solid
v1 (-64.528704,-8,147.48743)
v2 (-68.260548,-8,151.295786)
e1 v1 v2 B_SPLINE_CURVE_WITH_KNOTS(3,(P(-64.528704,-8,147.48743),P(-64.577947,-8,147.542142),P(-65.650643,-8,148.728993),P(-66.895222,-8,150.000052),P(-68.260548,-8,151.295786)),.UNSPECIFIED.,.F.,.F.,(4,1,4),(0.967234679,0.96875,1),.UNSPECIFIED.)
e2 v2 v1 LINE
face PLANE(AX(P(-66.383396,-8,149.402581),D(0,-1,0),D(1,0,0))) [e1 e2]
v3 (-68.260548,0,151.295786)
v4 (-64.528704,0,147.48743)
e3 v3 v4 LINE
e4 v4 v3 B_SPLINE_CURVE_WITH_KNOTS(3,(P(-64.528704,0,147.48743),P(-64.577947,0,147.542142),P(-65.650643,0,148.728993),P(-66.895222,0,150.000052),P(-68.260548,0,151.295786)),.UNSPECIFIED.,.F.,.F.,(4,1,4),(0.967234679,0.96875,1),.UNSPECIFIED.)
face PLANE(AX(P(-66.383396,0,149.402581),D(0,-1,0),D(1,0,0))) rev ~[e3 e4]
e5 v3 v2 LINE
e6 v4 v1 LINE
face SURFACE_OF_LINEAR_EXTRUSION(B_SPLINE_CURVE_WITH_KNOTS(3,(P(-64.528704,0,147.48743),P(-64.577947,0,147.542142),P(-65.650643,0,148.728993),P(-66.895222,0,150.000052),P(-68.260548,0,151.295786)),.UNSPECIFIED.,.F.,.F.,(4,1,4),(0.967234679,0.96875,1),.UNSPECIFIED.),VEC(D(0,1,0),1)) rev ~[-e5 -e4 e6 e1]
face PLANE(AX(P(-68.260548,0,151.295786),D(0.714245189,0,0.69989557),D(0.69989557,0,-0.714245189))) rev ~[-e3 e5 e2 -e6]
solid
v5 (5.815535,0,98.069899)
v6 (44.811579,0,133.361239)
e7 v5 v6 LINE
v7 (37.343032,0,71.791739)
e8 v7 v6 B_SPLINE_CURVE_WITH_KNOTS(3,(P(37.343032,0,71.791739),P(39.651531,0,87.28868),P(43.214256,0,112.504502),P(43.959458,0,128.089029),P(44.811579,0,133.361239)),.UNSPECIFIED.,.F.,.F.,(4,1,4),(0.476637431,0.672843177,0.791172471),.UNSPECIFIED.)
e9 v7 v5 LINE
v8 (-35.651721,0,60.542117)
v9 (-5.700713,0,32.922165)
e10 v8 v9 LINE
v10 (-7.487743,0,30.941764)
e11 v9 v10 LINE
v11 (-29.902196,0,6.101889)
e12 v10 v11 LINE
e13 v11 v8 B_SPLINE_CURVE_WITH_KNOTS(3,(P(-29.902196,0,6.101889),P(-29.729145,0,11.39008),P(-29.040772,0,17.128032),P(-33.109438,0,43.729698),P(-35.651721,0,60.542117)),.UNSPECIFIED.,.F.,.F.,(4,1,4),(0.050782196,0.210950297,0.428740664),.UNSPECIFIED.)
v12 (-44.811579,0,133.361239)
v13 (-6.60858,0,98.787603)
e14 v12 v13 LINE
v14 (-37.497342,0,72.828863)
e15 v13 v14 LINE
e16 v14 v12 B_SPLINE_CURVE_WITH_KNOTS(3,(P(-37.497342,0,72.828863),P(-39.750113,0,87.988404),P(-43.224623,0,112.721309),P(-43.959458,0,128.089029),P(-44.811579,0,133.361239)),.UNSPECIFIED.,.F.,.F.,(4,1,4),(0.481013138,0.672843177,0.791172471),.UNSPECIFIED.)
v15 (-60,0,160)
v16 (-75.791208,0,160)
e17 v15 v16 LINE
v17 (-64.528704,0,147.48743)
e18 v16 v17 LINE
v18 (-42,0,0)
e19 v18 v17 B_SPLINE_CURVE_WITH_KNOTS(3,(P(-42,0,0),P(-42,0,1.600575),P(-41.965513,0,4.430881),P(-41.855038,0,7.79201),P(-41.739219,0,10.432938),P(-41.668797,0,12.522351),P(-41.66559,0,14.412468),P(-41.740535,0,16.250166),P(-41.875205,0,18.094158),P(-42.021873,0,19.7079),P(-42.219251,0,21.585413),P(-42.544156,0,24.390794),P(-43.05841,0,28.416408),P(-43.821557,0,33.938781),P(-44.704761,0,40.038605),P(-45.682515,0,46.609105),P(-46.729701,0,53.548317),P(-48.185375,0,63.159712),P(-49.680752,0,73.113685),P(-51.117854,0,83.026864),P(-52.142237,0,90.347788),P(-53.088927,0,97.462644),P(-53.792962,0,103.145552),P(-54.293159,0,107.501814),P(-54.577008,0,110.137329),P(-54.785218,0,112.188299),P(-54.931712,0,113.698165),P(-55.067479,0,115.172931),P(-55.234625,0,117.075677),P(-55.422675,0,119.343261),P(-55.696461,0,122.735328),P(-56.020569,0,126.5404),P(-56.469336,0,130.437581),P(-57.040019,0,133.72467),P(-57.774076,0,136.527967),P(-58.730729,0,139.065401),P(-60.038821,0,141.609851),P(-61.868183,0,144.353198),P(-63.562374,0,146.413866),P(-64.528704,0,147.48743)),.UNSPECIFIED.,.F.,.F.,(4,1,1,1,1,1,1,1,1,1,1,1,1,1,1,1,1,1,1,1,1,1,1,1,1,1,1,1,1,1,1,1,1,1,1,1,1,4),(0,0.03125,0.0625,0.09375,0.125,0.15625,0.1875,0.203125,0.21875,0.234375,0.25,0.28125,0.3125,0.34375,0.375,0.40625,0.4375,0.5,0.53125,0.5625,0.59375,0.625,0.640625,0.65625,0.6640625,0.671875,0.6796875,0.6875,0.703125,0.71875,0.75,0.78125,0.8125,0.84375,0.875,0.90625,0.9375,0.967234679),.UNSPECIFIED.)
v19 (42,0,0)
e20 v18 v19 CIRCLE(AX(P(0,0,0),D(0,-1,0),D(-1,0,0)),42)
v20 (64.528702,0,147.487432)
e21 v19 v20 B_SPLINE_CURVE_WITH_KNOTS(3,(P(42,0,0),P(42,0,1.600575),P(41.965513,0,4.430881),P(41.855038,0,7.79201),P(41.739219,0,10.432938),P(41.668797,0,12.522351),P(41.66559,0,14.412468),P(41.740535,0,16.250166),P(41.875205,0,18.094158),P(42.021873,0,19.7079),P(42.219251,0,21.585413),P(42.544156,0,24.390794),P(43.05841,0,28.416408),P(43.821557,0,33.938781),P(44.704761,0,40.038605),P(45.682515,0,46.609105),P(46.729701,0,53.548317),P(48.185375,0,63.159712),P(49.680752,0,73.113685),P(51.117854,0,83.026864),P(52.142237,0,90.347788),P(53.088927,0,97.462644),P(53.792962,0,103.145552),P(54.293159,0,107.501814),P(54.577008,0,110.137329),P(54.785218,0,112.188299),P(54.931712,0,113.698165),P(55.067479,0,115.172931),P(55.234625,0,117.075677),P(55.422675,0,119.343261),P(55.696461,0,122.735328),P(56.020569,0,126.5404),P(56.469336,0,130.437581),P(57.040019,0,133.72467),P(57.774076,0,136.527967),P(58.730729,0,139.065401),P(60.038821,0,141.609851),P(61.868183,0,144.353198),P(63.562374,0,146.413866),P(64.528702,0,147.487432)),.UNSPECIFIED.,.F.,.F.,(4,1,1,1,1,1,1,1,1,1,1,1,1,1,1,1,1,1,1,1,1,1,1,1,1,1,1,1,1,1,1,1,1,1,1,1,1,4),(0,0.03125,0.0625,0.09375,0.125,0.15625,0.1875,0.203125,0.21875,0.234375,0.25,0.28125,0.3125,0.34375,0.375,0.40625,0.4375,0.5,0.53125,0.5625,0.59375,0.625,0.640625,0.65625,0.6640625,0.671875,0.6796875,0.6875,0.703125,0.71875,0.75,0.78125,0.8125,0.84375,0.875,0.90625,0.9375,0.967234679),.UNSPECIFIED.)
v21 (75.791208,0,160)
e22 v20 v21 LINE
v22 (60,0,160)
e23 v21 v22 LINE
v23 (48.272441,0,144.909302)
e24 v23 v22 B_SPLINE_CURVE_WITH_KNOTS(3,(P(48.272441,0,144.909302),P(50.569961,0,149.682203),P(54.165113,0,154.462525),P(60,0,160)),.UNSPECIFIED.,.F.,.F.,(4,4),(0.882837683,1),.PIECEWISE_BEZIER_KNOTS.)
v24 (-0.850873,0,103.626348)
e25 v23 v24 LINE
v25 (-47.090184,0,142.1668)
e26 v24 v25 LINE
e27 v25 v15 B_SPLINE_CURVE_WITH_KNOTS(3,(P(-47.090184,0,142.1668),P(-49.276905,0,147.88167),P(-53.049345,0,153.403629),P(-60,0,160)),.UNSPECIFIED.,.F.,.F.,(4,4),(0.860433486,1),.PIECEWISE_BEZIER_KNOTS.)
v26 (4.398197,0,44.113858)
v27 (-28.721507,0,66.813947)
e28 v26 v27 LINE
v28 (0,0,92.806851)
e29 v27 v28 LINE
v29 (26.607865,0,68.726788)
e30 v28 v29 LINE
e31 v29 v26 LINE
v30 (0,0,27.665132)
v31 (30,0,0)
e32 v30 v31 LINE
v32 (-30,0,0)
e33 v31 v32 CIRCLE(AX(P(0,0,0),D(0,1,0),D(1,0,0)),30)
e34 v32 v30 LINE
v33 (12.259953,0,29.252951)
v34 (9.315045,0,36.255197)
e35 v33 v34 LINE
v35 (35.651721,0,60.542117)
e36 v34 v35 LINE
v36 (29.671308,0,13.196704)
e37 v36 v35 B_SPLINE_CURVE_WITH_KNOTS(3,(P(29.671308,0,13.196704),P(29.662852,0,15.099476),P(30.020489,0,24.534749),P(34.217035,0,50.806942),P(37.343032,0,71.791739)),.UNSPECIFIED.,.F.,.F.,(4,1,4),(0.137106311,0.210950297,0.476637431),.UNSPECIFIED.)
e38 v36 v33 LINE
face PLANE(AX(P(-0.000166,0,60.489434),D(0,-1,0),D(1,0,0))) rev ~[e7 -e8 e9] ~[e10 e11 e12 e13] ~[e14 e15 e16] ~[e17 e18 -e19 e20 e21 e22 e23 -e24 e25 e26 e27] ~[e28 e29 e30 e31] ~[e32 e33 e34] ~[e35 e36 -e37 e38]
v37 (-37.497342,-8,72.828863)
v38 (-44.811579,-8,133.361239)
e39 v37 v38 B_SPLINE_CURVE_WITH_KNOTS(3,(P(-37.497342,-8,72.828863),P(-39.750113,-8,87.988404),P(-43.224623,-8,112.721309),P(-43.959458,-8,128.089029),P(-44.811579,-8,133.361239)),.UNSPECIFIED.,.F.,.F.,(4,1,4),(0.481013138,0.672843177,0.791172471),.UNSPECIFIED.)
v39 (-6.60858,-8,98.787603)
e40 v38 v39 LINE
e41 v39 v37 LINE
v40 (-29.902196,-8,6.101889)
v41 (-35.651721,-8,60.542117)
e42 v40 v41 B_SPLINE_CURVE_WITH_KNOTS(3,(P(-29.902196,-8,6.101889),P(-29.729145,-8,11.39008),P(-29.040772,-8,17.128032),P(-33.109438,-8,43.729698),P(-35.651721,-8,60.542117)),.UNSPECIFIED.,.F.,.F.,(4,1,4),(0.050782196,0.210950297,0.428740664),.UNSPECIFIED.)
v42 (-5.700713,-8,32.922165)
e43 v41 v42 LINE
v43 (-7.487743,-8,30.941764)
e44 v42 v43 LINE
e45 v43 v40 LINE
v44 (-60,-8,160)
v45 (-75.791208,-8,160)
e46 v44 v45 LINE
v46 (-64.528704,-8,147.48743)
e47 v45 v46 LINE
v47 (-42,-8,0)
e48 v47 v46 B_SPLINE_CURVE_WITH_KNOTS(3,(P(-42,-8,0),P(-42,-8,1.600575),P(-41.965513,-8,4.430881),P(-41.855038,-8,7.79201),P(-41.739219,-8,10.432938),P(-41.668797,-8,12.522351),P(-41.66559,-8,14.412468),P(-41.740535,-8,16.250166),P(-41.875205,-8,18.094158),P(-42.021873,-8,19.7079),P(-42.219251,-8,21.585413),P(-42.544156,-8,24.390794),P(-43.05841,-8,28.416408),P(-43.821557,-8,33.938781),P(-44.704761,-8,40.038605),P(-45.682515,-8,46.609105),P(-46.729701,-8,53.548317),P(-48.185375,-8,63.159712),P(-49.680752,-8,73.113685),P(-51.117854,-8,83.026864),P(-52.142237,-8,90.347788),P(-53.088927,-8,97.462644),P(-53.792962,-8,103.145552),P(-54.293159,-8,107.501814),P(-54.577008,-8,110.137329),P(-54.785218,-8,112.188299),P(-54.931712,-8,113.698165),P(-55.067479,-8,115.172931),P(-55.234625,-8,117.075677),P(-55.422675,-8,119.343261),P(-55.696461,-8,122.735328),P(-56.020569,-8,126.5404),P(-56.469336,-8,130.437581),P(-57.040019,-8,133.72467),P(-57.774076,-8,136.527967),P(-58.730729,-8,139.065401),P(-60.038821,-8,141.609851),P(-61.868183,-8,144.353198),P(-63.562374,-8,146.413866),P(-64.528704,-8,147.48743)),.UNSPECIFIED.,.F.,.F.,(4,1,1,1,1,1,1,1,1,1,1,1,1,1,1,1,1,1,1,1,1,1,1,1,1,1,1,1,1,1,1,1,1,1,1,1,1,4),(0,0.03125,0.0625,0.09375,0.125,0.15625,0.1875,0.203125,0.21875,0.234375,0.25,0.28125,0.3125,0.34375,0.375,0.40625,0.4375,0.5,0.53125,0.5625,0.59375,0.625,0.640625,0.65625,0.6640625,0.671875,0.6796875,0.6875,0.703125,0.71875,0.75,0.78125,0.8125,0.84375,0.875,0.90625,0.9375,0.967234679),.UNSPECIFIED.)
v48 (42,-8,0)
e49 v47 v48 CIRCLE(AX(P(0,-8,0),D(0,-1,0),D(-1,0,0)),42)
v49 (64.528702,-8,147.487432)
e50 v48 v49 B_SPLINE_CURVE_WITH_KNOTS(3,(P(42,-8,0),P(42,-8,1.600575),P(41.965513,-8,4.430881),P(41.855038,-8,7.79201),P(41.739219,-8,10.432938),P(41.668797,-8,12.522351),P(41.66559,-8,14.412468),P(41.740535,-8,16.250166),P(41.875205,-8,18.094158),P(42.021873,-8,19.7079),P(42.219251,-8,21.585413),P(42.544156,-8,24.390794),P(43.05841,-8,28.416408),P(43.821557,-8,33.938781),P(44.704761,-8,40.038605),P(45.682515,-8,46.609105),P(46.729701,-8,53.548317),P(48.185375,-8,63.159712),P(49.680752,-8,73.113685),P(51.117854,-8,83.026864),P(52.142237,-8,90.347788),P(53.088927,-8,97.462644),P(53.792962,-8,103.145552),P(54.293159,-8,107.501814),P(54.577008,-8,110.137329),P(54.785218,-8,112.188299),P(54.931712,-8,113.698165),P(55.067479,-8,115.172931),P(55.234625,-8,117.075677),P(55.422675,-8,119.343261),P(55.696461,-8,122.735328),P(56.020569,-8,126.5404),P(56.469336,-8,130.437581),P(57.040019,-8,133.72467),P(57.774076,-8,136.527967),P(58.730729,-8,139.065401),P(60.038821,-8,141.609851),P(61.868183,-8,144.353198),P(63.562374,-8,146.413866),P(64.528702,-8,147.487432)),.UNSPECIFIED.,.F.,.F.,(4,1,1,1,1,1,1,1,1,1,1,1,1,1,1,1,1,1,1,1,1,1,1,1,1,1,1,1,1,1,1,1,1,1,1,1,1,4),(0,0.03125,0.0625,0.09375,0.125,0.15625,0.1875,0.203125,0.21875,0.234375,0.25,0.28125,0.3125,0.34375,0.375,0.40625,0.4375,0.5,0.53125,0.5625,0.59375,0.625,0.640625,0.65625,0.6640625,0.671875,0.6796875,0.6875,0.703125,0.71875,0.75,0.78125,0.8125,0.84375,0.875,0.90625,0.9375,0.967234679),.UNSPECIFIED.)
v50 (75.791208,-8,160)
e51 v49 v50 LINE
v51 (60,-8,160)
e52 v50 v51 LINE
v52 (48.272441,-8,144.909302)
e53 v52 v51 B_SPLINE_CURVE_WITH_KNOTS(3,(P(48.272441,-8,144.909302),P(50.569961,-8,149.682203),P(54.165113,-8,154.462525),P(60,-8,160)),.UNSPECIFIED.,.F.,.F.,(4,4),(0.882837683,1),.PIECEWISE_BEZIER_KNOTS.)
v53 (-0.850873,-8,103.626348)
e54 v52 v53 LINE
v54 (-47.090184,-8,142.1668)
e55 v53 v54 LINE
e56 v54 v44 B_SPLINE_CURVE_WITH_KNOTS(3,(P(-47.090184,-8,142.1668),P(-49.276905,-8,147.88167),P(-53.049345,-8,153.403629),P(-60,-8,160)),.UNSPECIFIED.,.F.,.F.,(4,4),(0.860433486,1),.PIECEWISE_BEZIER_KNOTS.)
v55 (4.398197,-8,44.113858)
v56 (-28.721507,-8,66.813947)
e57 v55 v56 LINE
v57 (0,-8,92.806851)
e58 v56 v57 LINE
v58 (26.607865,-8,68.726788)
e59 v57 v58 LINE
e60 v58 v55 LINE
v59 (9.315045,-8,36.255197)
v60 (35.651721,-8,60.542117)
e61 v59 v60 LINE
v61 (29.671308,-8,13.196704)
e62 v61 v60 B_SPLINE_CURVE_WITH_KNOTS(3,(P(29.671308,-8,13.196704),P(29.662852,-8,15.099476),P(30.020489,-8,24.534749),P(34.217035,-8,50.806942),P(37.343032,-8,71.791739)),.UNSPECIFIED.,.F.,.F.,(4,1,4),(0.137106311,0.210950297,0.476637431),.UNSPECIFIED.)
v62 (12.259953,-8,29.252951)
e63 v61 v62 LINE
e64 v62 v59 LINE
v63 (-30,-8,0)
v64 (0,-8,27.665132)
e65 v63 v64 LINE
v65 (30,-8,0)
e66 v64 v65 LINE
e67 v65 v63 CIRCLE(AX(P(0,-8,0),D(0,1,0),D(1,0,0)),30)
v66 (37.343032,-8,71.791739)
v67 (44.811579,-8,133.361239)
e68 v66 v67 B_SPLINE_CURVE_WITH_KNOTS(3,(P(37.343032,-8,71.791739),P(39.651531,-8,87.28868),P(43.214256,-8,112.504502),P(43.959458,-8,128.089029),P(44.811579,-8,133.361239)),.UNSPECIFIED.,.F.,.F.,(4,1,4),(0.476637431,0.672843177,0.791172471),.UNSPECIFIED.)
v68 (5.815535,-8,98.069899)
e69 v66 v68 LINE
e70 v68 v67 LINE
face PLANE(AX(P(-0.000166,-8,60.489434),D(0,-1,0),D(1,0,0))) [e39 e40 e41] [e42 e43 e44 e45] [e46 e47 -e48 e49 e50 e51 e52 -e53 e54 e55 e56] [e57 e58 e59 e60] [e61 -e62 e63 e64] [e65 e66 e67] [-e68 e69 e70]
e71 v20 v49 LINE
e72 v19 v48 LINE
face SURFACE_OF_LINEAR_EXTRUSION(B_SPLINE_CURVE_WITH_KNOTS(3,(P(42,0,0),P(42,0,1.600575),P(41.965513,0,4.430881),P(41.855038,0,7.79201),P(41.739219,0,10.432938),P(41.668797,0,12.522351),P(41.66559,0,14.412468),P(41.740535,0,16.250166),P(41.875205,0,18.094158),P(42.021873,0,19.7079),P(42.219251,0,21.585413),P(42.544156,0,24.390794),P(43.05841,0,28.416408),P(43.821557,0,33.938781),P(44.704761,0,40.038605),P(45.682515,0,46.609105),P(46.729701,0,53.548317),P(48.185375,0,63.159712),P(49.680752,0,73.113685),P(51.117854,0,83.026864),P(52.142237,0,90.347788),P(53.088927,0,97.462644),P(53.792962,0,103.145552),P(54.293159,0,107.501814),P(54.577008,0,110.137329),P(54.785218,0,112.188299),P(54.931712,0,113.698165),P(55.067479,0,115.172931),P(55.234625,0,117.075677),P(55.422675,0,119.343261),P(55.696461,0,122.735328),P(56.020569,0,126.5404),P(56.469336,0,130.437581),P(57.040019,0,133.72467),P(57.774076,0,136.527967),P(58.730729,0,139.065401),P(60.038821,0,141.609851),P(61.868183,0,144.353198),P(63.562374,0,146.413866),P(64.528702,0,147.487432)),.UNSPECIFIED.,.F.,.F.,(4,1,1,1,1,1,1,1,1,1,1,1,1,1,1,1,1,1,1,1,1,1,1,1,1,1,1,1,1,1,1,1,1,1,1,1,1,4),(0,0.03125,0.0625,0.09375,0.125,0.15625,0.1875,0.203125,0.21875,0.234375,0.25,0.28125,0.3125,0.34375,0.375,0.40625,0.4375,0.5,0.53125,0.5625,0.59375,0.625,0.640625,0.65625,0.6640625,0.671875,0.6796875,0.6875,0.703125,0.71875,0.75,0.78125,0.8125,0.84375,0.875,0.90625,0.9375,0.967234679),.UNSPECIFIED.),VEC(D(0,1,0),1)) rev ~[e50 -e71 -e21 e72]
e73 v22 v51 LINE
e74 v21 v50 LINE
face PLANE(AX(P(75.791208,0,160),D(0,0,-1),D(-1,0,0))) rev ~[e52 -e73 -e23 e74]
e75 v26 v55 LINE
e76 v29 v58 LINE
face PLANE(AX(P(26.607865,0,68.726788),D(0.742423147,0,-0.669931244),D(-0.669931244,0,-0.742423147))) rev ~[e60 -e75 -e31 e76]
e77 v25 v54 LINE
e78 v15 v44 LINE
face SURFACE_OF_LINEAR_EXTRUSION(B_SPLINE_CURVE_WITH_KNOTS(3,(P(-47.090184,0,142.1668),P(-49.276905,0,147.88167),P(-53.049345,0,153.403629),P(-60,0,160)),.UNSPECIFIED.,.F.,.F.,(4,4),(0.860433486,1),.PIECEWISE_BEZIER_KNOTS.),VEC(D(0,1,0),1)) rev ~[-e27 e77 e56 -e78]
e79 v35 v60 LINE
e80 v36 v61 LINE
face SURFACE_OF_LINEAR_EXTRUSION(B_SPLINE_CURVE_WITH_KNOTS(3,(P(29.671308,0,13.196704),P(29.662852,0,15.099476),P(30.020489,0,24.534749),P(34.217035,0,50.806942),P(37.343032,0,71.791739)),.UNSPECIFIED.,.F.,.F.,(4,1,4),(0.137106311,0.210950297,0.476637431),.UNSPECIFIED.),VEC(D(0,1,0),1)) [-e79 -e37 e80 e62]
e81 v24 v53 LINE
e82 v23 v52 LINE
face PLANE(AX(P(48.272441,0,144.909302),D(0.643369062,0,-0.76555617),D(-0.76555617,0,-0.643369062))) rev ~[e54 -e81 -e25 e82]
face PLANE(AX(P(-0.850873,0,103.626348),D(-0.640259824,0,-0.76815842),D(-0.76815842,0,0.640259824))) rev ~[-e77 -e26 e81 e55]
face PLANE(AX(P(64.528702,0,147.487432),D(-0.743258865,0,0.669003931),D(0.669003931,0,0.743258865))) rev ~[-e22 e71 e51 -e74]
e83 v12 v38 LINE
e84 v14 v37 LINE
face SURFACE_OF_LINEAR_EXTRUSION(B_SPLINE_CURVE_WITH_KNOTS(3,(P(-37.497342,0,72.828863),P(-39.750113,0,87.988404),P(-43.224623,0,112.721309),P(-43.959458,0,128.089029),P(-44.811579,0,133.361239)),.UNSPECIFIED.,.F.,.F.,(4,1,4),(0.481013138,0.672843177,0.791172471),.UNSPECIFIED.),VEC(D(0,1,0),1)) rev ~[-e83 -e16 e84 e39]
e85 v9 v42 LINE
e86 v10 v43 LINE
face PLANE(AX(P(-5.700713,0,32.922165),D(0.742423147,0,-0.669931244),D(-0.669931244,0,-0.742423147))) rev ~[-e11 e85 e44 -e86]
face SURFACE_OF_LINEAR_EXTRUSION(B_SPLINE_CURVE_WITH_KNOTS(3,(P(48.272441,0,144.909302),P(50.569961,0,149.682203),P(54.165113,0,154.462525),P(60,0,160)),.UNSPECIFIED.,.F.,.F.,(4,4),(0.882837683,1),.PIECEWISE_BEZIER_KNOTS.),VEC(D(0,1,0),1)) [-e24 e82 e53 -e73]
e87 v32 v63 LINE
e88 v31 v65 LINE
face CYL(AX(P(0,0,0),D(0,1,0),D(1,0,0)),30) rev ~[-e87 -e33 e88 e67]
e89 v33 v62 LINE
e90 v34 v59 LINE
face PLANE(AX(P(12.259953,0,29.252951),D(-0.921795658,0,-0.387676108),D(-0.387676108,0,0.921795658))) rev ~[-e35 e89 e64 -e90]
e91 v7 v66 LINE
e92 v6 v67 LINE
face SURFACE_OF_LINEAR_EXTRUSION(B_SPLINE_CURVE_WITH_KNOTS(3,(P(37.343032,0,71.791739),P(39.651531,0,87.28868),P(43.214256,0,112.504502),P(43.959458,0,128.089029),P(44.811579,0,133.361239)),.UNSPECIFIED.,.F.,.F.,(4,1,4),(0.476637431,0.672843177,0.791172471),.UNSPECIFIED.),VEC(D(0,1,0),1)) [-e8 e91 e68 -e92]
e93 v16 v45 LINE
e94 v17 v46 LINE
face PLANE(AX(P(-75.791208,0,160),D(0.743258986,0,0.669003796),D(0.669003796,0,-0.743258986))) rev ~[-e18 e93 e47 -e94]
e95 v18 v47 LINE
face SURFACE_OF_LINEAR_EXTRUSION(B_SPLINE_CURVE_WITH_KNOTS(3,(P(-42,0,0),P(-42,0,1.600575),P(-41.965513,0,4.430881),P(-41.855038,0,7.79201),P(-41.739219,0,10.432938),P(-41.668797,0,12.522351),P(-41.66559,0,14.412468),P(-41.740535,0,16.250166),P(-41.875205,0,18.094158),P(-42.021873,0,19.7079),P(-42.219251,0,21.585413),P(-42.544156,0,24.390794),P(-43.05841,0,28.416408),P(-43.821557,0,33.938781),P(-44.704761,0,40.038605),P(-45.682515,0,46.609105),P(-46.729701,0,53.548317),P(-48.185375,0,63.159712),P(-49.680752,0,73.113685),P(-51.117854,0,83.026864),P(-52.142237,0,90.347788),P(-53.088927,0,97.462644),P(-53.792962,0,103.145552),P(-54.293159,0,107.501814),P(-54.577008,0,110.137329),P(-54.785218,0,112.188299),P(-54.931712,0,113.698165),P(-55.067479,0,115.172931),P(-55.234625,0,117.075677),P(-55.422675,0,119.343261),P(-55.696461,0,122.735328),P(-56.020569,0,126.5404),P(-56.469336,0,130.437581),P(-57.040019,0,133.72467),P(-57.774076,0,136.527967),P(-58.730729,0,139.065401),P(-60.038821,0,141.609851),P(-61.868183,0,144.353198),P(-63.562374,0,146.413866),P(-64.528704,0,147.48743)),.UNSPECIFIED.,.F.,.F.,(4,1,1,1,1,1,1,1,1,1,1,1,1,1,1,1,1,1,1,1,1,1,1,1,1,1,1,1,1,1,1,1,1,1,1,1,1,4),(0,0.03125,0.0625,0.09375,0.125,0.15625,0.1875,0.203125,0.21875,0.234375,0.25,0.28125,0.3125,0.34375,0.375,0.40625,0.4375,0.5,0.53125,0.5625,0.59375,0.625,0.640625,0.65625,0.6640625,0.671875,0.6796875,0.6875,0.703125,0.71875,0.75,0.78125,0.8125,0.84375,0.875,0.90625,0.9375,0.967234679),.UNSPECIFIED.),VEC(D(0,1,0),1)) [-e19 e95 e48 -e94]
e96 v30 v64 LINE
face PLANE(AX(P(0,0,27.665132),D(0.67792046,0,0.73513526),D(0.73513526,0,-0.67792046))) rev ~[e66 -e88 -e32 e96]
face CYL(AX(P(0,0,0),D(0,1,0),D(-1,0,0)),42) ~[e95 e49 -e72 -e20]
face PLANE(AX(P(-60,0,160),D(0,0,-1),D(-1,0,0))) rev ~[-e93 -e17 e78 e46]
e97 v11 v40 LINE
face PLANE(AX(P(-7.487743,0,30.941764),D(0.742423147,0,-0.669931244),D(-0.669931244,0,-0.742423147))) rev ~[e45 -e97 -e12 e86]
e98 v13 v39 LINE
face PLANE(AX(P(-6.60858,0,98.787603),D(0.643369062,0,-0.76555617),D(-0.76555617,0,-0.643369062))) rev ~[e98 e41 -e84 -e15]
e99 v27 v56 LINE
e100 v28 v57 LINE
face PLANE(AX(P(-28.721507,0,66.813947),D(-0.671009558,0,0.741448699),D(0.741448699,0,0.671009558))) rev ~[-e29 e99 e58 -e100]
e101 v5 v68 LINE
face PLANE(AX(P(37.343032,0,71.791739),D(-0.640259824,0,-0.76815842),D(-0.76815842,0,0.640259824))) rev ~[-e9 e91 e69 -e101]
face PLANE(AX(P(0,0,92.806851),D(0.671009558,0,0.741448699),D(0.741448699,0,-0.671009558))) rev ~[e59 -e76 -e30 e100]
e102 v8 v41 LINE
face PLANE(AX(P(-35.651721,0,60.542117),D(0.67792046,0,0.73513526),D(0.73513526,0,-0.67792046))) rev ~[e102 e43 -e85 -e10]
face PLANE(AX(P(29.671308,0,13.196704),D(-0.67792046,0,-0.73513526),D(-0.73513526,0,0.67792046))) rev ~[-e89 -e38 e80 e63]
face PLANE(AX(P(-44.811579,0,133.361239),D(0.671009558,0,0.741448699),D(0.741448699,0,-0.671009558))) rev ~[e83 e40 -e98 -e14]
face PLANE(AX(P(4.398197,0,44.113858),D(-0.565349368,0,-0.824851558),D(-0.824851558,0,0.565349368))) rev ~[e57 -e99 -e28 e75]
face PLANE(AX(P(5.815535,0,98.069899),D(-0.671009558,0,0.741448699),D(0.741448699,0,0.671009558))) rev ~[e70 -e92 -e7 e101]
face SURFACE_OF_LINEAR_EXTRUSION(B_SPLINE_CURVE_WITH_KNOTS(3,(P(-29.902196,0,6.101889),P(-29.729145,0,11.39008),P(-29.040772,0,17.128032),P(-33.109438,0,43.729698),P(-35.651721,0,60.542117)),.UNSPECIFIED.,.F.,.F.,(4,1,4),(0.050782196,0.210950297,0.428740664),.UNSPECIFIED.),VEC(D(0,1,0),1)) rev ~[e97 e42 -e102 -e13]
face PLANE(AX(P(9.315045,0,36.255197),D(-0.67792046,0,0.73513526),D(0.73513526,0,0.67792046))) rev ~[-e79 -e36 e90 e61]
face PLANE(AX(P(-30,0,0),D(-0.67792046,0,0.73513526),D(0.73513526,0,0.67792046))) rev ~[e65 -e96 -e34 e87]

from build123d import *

# Parameters (mm, degrees)
F1_DEPTH = 8


# Not quite as in the source:
# - ends of sketch curves that miss each other by under 0.0002 mm in the source are joined
# - the dataset's text gives a spline's control points without its knots; the knots are read off the source's solid


with BuildPart() as f1:
    # F0 (on Front) → F1 (new body)
    with BuildSketch(Plane.XZ):
        with BuildLine():
            ThreePointArc((30, 0), (0, -30), (-30, 0))
            add(Edge.make_bspline(
                [(-30, 0), (-30, 2.4614289794), (-29.9570620291, 4.425238293), (-29.9021955407, 6.1018890111)],
                knots=[0, 0, 0, 0, 0.0507821961, 0.0507821961, 0.0507821961, 0.0507821961], degree=3))
            add(Edge.make_bspline(
                [(-29.9021955407, 6.1018890111), (-29.729145497, 11.3900801856), (-29.0407722192, 17.1280316278), (-33.1094379747, 43.7296976474), (-35.6517208897, 60.5421168552)],
                knots=[0.0507821961, 0.0507821961, 0.0507821961, 0.0507821961, 0.2109502969, 0.4287406637, 0.4287406637, 0.4287406637, 0.4287406637], degree=3))
            add(Edge.make_bspline(
                [(-35.6517208897, 60.5421168552), (-36.2619013169, 64.5773125741), (-36.8834763856, 68.6979834975), (-37.4973421406, 72.8288627488)],
                knots=[0.4287406637, 0.4287406637, 0.4287406637, 0.4287406637, 0.4810131383, 0.4810131383, 0.4810131383, 0.4810131383], degree=3))
            add(Edge.make_bspline(
                [(-37.4973421406, 72.8288627488), (-39.7501126984, 87.9884038692), (-43.2246230426, 112.7213086259), (-43.9594576429, 128.0890294092), (-44.8115788997, 133.3612387466)],
                knots=[0.4810131383, 0.4810131383, 0.4810131383, 0.4810131383, 0.6728431772, 0.7911724712, 0.7911724712, 0.7911724712, 0.7911724712], degree=3))
            add(Edge.make_bspline(
                [(-44.8115788997, 133.3612387466), (-45.3103462028, 136.447191141), (-46.0050057355, 139.330749893), (-47.0901836836, 142.1668002137)],
                knots=[0.7911724712, 0.7911724712, 0.7911724712, 0.7911724712, 0.8604334859, 0.8604334859, 0.8604334859, 0.8604334859], degree=3))
            add(Edge.make_bspline(
                [(-47.0901836836, 142.1668002137), (-49.276904514, 147.8816696714), (-53.0493445367, 153.4036288123), (-60, 160)],
                knots=[0.8604334859, 0.8604334859, 0.8604334859, 0.8604334859, 1, 1, 1, 1], degree=3))
            Line((-60, 160), (-75.7912078503, 160))
            Line((-75.7912078503, 160), (-64.5287041289, 147.4874296074))
            add(Edge.make_bspline(
                [(-42, 0), (-42, 1.6005754669), (-41.9655130874, 4.4308812587), (-41.855037906, 7.7920099217), (-41.7392191804, 10.4329382139), (-41.6687973515, 12.5223510859), (-41.6655902329, 14.4124679691), (-41.7405354814, 16.2501659159), (-41.8752052785, 18.0941584324), (-42.0218726875, 19.7078997416), (-42.2192508321, 21.5854126614), (-42.5441555785, 24.3907941472), (-43.0584097586, 28.4164081533), (-43.8215565262, 33.9387807166), (-44.704760888, 40.0386050466), (-45.6825150065, 46.6091045203), (-46.729700777, 53.5483169764), (-48.1853745042, 63.1597115369), (-49.6807523059, 73.1136847555), (-51.1178539545, 83.0268637762), (-52.1422369475, 90.3477881632), (-53.0889269797, 97.46264393), (-53.7929616933, 103.1455520068), (-54.2931590626, 107.5018139684), (-54.5770081877, 110.1373290926), (-54.785218118, 112.1882992533), (-54.9317117815, 113.6981648795), (-55.0674795, 115.1729311359), (-55.2346249069, 117.0756772852), (-55.4226748319, 119.3432613555), (-55.6964606027, 122.7353278016), (-56.0205686836, 126.5404004884), (-56.4693363175, 130.4375806245), (-57.0400191966, 133.724670433), (-57.7740762341, 136.5279673443), (-58.7307292964, 139.0654005001), (-60.038821229, 141.6098513339), (-61.868182594, 144.3531979669), (-63.5623744944, 146.4138663543), (-64.5287041289, 147.4874296074)],
                knots=[0, 0, 0, 0, 0.03125, 0.0625, 0.09375, 0.125, 0.15625, 0.1875, 0.203125, 0.21875, 0.234375, 0.25, 0.28125, 0.3125, 0.34375, 0.375, 0.40625, 0.4375, 0.5, 0.53125, 0.5625, 0.59375, 0.625, 0.640625, 0.65625, 0.6640625, 0.671875, 0.6796875, 0.6875, 0.703125, 0.71875, 0.75, 0.78125, 0.8125, 0.84375, 0.875, 0.90625, 0.9375, 0.9672346787, 0.9672346787, 0.9672346787, 0.9672346787], degree=3))
            ThreePointArc((-42, 0), (0, -42), (42, 0))
            add(Edge.make_bspline(
                [(42, 0), (42, 1.6005754669), (41.9655130874, 4.4308812587), (41.855037906, 7.7920099217), (41.7392191804, 10.4329382139), (41.6687973515, 12.5223510859), (41.6655902329, 14.4124679691), (41.7405354814, 16.2501659159), (41.8752052785, 18.0941584324), (42.0218726875, 19.7078997416), (42.2192508321, 21.5854126614), (42.5441555785, 24.3907941472), (43.0584097586, 28.4164081533), (43.8215565262, 33.9387807166), (44.704760888, 40.0386050466), (45.6825150065, 46.6091045203), (46.729700777, 53.5483169764), (48.1853745042, 63.1597115369), (49.6807523059, 73.1136847555), (51.1178539545, 83.0268637762), (52.1422369475, 90.3477881632), (53.0889269797, 97.46264393), (53.7929616933, 103.1455520068), (54.2931590626, 107.5018139684), (54.5770081877, 110.1373290926), (54.785218118, 112.1882992533), (54.9317117815, 113.6981648795), (55.0674795, 115.1729311359), (55.2346249069, 117.0756772852), (55.4226748319, 119.3432613555), (55.6964606027, 122.7353278016), (56.0205686836, 126.5404004884), (56.4693363175, 130.4375806245), (57.0400191966, 133.724670433), (57.7740762341, 136.5279673443), (58.7307292964, 139.0654005001), (60.038821229, 141.6098513339), (61.8681825939, 144.3531979667), (63.5623744942, 146.413866354), (64.5287018696, 147.4874316403)],
                knots=[0, 0, 0, 0, 0.03125, 0.0625, 0.09375, 0.125, 0.15625, 0.1875, 0.203125, 0.21875, 0.234375, 0.25, 0.28125, 0.3125, 0.34375, 0.375, 0.40625, 0.4375, 0.5, 0.53125, 0.5625, 0.59375, 0.625, 0.640625, 0.65625, 0.6640625, 0.671875, 0.6796875, 0.6875, 0.703125, 0.71875, 0.75, 0.78125, 0.8125, 0.84375, 0.875, 0.90625, 0.9375, 0.9672346787, 0.9672346787, 0.9672346787, 0.9672346787], degree=3))
            Line((64.5287018696, 147.4874316403), (75.7912078503, 160))
            Line((75.7912078503, 160), (60, 160))
            add(Edge.make_bspline(
                [(48.2724414023, 144.9093022824), (50.569960834, 149.6822034282), (54.1651125594, 154.4625246354), (60, 160)],
                knots=[0.8828376828, 0.8828376828, 0.8828376828, 0.8828376828, 1, 1, 1, 1], degree=3))
            add(Edge.make_bspline(
                [(44.8115788997, 133.3612387466), (45.4716848854, 137.4454191543), (46.4749128994, 141.175089752), (48.2724414023, 144.9093022824)],
                knots=[0.7911724712, 0.7911724712, 0.7911724712, 0.7911724712, 0.8828376828, 0.8828376828, 0.8828376828, 0.8828376828], degree=3))
            add(Edge.make_bspline(
                [(37.3430319519, 71.791739017), (39.6515310986, 87.288679601), (43.214256046, 112.504501865), (43.9594576429, 128.0890294092), (44.8115788997, 133.3612387466)],
                knots=[0.4766374315, 0.4766374315, 0.4766374315, 0.4766374315, 0.6728431772, 0.7911724712, 0.7911724712, 0.7911724712, 0.7911724712], degree=3))
            add(Edge.make_bspline(
                [(35.6517208897, 60.5421168552), (36.2108233707, 64.2395280423), (36.7794926575, 68.008703197), (37.3430319519, 71.791739017)],
                knots=[0.4287406637, 0.4287406637, 0.4287406637, 0.4287406637, 0.4766374315, 0.4766374315, 0.4766374315, 0.4766374315], degree=3))
            add(Edge.make_bspline(
                [(29.6713075743, 13.1967035579), (29.6628515767, 15.0994757405), (29.9700382624, 23.2037395896), (33.1094379747, 43.7296976474), (35.6517208897, 60.5421168552)],
                knots=[0.1371063109, 0.1371063109, 0.1371063109, 0.1371063109, 0.2109502969, 0.4287406637, 0.4287406637, 0.4287406637, 0.4287406637], degree=3))
            add(Edge.make_bspline(
                [(30, 0), (30, 6.6455859091), (29.6870078458, 9.6638217567), (29.6713075743, 13.1967035579)],
                knots=[0, 0, 0, 0, 0.1371063109, 0.1371063109, 0.1371063109, 0.1371063109], degree=3))
        make_face()
        with BuildLine():
            add(Edge.make_bspline(
                [(-30, 0), (-30, 2.4614289794), (-29.9570620291, 4.425238293), (-29.9021955407, 6.1018890111)],
                knots=[0, 0, 0, 0, 0.0507821961, 0.0507821961, 0.0507821961, 0.0507821961], degree=3))
            Line((-30, 0), (0, 27.6651317139))
            Line((0, 27.6651317139), (30, 0))
            add(Edge.make_bspline(
                [(30, 0), (30, 6.6455859091), (29.6870078458, 9.6638217567), (29.6713075743, 13.1967035579)],
                knots=[0, 0, 0, 0, 0.1371063109, 0.1371063109, 0.1371063109, 0.1371063109], degree=3))
            Line((29.6713075743, 13.1967035579), (12.2599532494, 29.2529505818))
            Line((12.2599532494, 29.2529505818), (9.3150451178, 36.2551967174))
            Line((9.3150451178, 36.2551967174), (35.6517208897, 60.5421168552))
            add(Edge.make_bspline(
                [(35.6517208897, 60.5421168552), (36.2108233707, 64.2395280423), (36.7794926575, 68.008703197), (37.3430319519, 71.791739017)],
                knots=[0.4287406637, 0.4287406637, 0.4287406637, 0.4287406637, 0.4766374315, 0.4766374315, 0.4766374315, 0.4766374315], degree=3))
            Line((37.3430319519, 71.791739017), (5.8155350287, 98.0698987276))
            Line((5.8155350287, 98.0698987276), (44.8115788997, 133.3612387466))
            add(Edge.make_bspline(
                [(44.8115788997, 133.3612387466), (45.4716848854, 137.4454191543), (46.4749128994, 141.175089752), (48.2724414023, 144.9093022824)],
                knots=[0.7911724712, 0.7911724712, 0.7911724712, 0.7911724712, 0.8828376828, 0.8828376828, 0.8828376828, 0.8828376828], degree=3))
            Line((48.2724414023, 144.9093022824), (-0.8508727636, 103.6263477247))
            Line((-0.8508727636, 103.6263477247), (-47.0901836836, 142.1668002137))
            add(Edge.make_bspline(
                [(-44.8115788997, 133.3612387466), (-45.3103462028, 136.447191141), (-46.0050057355, 139.330749893), (-47.0901836836, 142.1668002137)],
                knots=[0.7911724712, 0.7911724712, 0.7911724712, 0.7911724712, 0.8604334859, 0.8604334859, 0.8604334859, 0.8604334859], degree=3))
            Line((-44.8115788997, 133.3612387466), (-6.6085802404, 98.7876030236))
            Line((-6.6085802404, 98.7876030236), (-37.4973421406, 72.8288627488))
            add(Edge.make_bspline(
                [(-35.6517208897, 60.5421168552), (-36.2619013169, 64.5773125741), (-36.8834763856, 68.6979834975), (-37.4973421406, 72.8288627488)],
                knots=[0.4287406637, 0.4287406637, 0.4287406637, 0.4287406637, 0.4810131383, 0.4810131383, 0.4810131383, 0.4810131383], degree=3))
            Line((-35.6517208897, 60.5421168552), (-5.7007133502, 32.9221645704))
            Line((-5.7007133502, 32.9221645704), (-7.4877431959, 30.9417638447))
            Line((-7.4877431959, 30.9417638447), (-29.9021955407, 6.1018890111))
        make_face()
        Polygon((0, 92.80685141), (26.6078646081, 68.7267883099), (4.3981971277, 44.1138576962), (-28.7215067093, 66.8139465274), align=None, mode=Mode.SUBTRACT)
    extrude(amount=F1_DEPTH)


with BuildPart() as f1b:
    # F0 (on Front) → F1, piece 2 (new body)
    with BuildSketch(Plane.XZ):
        with BuildLine():
            Line((-68.2605484083, 151.2957860783), (-64.5287041289, 147.4874296074))
            add(Edge.make_bspline(
                [(-64.5287041289, 147.4874296074), (-64.5779472792, 147.5421420454), (-65.6506429565, 148.7289934621), (-66.8952221283, 150.0000523188), (-68.2605484083, 151.2957860783)],
                knots=[0.9672346787, 0.9672346787, 0.9672346787, 0.9672346787, 0.96875, 1, 1, 1, 1], degree=3))
        make_face()
    extrude(amount=F1_DEPTH)


solid = Compound([f1.part, f1b.part])
